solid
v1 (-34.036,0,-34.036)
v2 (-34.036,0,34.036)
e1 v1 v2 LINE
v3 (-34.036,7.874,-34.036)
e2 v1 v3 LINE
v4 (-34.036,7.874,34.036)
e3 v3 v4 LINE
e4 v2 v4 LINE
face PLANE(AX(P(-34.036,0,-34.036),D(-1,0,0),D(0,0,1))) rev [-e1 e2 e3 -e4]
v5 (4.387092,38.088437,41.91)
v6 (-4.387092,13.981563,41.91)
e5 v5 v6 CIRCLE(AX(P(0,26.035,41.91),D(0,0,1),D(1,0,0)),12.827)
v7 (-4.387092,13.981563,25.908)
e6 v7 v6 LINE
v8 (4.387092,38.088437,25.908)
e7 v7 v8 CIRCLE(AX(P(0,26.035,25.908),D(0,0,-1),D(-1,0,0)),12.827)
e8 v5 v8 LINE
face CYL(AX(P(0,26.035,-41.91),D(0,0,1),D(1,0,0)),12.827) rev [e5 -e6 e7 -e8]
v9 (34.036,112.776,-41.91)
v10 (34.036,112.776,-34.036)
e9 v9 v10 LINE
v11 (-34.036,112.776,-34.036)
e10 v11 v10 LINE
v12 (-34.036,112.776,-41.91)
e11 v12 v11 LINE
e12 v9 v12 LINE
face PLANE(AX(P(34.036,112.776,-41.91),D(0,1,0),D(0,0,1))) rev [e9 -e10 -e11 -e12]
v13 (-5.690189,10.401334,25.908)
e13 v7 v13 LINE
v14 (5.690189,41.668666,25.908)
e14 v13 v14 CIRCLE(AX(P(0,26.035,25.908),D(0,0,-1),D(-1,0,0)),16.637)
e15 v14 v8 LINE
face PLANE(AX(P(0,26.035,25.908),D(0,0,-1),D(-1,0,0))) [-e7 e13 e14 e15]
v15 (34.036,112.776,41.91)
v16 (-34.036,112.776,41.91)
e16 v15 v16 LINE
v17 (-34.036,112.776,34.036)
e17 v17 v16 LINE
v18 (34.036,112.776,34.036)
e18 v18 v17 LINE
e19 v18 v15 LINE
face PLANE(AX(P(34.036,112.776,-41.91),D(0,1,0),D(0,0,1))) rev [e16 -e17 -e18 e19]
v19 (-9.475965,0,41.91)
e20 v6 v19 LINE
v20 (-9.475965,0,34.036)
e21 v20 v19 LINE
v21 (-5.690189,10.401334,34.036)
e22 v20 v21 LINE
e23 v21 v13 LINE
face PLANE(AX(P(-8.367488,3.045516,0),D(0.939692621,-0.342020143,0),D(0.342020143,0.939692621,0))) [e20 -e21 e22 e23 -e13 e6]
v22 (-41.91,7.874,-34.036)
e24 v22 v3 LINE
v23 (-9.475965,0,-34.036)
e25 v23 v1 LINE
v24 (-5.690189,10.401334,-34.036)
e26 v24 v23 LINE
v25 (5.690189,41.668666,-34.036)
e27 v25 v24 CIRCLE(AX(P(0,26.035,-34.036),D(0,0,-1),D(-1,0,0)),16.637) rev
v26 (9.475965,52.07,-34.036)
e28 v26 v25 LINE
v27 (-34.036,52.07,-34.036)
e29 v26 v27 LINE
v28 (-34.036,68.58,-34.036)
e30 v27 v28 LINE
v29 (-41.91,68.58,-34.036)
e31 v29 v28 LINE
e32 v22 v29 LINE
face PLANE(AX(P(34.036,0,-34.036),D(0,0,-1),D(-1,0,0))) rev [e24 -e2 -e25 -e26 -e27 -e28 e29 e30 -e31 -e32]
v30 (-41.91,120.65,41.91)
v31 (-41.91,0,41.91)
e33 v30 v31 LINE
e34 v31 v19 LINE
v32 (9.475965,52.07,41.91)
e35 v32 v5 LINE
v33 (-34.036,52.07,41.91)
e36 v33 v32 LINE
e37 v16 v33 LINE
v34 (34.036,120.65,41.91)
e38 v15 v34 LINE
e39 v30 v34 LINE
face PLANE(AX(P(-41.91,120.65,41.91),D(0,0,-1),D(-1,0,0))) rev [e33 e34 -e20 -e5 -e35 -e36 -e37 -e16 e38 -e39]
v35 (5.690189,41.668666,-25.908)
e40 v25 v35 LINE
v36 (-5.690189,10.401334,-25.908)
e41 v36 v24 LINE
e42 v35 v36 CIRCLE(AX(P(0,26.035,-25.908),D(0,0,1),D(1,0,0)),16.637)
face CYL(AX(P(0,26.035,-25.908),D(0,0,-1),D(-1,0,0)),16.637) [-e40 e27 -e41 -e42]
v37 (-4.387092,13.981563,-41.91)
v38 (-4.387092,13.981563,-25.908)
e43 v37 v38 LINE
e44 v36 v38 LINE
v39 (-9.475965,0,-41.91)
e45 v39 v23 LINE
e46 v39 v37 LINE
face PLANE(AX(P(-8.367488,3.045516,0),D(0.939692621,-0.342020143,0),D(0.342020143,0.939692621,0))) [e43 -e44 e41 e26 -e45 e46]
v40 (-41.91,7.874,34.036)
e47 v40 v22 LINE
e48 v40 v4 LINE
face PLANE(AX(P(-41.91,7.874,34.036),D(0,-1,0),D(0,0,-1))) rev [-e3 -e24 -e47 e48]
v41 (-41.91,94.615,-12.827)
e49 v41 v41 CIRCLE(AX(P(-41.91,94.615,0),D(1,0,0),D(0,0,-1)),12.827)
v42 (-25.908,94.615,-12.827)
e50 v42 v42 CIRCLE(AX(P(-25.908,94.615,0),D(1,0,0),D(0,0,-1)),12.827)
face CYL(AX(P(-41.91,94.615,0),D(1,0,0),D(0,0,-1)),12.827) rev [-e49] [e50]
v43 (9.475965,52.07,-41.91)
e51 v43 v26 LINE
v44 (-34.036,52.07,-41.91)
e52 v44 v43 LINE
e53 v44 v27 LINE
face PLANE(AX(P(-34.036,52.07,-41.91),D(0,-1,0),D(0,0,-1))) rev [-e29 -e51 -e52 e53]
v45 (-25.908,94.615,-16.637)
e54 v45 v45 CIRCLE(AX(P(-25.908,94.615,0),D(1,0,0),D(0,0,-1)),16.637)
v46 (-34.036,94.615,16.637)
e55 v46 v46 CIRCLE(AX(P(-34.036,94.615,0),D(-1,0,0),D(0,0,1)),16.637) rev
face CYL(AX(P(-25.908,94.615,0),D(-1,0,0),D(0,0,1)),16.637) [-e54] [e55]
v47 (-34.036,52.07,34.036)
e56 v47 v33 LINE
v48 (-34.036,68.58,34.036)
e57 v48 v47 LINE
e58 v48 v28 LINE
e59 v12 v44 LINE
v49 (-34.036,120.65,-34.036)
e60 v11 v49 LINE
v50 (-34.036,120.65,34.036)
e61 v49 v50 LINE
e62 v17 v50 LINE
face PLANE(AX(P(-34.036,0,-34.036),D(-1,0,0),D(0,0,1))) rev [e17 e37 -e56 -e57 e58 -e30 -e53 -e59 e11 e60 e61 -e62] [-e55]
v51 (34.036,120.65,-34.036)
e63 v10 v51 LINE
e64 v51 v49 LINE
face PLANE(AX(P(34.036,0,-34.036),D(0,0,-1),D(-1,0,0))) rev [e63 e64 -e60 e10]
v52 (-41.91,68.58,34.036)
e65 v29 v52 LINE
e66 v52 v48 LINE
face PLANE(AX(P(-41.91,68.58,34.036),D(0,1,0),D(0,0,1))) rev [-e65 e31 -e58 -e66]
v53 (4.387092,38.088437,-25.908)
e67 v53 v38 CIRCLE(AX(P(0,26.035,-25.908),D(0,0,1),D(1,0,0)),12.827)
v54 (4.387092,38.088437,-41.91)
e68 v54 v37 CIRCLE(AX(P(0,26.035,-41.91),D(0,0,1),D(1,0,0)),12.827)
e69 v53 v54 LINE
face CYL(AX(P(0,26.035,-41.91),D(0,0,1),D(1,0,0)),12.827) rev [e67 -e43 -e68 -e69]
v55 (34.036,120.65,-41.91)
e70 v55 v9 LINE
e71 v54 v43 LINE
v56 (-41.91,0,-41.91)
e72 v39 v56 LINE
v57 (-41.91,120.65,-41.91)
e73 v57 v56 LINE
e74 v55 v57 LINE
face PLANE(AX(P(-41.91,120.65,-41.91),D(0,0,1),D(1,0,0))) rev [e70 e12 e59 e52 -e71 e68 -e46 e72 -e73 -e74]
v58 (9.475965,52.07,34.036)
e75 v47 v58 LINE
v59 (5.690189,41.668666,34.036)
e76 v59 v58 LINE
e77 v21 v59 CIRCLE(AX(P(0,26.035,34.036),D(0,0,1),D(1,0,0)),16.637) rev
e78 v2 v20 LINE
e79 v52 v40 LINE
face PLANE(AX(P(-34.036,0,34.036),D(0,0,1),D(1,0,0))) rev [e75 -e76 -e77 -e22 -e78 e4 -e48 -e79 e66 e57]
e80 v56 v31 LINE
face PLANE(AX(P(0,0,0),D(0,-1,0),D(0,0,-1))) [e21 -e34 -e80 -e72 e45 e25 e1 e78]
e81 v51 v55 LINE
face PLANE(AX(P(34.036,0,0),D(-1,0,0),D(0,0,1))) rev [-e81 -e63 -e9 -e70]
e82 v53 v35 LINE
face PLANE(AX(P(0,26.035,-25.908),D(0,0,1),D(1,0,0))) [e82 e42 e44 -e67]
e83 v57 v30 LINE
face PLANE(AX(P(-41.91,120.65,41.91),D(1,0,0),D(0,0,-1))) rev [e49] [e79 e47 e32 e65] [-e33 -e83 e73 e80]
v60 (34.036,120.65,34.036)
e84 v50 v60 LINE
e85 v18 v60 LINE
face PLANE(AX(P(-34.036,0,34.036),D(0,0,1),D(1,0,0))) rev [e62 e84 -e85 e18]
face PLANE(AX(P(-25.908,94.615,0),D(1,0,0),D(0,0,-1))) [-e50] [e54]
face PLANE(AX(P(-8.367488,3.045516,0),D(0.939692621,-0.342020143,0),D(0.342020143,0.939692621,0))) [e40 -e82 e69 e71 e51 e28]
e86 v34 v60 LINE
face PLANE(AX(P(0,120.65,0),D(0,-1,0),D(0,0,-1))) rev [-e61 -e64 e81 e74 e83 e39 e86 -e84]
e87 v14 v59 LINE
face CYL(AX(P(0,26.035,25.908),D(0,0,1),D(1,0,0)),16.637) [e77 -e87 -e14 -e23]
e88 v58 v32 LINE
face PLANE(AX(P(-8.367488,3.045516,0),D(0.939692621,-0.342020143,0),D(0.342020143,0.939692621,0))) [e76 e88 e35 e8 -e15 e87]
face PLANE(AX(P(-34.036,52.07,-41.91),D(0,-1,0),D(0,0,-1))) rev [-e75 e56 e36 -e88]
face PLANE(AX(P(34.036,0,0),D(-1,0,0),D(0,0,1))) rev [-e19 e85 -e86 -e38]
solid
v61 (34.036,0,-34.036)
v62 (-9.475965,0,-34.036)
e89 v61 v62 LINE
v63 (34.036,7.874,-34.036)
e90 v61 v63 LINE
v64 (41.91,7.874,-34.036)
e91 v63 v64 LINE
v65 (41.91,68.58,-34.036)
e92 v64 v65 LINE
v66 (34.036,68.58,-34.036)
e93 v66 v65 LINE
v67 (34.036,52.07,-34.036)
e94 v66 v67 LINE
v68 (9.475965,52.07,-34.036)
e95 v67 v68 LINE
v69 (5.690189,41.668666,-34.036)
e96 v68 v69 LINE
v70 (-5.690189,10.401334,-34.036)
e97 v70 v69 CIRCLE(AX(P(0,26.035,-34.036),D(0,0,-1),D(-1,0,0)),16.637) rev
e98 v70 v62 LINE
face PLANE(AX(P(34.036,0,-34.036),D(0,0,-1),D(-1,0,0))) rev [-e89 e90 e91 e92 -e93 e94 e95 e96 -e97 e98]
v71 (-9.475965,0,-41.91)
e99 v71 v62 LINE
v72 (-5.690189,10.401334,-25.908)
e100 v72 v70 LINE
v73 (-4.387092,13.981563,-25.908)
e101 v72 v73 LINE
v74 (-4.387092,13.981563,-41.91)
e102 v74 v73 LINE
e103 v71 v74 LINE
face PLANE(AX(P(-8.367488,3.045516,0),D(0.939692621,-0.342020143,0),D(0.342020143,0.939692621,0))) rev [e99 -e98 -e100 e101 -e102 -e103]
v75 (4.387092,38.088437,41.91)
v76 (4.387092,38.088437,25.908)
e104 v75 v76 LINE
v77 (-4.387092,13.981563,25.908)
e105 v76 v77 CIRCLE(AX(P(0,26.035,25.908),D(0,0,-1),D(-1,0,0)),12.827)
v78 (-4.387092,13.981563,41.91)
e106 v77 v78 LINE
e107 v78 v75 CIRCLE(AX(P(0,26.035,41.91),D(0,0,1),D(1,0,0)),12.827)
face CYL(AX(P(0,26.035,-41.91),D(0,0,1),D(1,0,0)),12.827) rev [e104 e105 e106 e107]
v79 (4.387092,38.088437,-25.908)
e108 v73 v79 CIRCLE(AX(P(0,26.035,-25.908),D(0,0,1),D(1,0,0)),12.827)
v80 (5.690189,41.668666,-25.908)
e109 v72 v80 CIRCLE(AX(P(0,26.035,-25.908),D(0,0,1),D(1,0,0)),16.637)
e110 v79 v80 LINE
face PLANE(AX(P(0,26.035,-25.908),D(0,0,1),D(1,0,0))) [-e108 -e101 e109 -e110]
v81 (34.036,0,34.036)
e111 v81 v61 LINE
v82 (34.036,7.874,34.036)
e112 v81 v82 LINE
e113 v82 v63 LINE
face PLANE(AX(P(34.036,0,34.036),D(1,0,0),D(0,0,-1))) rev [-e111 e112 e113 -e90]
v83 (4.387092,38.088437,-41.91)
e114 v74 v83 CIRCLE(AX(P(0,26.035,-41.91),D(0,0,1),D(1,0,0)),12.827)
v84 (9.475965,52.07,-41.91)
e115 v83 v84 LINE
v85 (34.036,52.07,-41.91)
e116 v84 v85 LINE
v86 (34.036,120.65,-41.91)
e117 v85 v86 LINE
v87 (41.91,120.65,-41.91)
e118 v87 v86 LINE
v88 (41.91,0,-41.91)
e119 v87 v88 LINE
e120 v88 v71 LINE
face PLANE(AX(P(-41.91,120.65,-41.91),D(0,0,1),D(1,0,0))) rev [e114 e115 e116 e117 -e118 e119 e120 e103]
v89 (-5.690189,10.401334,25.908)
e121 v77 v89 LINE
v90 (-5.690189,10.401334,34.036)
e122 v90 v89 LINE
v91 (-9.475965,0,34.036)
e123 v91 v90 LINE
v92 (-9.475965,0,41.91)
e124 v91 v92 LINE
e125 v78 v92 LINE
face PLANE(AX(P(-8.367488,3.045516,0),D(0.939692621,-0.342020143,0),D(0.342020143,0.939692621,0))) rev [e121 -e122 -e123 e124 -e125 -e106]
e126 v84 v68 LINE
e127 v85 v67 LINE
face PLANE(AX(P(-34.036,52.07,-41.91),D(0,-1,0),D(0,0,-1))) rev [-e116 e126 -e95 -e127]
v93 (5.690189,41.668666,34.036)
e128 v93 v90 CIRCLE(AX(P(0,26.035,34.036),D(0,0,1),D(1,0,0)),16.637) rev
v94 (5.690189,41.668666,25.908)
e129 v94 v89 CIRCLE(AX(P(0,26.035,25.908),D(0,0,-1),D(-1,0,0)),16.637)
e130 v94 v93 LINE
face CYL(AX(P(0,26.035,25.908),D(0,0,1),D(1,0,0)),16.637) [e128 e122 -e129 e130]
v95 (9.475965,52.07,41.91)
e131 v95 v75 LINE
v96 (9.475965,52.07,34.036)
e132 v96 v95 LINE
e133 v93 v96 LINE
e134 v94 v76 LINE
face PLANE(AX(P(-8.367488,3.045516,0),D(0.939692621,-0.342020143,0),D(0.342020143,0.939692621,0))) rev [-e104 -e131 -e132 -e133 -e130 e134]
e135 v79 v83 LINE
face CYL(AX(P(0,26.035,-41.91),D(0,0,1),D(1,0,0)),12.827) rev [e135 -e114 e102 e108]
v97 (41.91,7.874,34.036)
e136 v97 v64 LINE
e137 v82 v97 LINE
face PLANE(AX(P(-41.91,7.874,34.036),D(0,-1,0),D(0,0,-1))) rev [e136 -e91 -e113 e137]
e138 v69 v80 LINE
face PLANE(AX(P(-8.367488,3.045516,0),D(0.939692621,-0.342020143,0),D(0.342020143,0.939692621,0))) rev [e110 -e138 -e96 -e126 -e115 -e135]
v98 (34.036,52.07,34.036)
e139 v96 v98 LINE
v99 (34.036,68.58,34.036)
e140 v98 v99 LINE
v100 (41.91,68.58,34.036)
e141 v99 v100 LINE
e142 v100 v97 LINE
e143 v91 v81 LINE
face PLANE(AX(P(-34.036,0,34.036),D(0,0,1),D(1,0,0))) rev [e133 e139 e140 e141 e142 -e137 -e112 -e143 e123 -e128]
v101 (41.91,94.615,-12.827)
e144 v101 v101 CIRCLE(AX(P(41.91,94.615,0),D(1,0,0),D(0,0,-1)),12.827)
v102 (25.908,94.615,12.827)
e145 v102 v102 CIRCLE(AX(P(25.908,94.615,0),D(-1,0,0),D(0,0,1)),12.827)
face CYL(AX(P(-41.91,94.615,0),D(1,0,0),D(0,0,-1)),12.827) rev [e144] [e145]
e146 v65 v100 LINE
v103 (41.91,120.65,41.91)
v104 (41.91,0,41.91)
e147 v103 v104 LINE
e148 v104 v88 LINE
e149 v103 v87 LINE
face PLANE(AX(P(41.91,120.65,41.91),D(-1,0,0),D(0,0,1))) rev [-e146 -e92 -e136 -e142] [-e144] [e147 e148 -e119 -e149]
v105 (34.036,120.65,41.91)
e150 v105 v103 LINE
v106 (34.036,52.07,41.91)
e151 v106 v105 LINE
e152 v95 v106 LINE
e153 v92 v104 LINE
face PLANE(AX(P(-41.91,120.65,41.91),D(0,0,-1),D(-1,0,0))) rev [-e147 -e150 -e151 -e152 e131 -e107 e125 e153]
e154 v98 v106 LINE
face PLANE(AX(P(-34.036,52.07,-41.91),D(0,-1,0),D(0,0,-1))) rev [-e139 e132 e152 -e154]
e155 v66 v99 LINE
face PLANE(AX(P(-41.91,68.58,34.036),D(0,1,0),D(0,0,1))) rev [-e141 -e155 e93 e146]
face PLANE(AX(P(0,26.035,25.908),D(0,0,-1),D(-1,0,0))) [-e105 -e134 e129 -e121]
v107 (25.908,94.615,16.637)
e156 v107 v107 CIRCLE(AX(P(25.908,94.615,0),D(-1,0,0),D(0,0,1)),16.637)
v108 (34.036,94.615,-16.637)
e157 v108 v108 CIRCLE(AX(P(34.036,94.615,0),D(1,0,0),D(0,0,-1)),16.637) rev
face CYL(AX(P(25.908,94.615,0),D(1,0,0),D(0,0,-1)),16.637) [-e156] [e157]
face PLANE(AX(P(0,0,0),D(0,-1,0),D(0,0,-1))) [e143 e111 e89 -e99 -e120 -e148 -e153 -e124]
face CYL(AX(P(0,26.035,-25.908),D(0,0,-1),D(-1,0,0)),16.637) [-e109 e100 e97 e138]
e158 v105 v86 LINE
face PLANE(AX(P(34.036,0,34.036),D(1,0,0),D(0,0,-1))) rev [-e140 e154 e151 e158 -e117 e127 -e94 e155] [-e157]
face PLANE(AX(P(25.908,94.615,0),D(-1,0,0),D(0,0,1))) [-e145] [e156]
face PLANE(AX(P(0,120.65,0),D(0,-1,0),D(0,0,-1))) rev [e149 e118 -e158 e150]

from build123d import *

# Parameters (mm, degrees)
SKETCH2_W                = 83.82
SKETCH2_H                = 83.82
BOSS_EXTRUDE1_DEPTH      = 120.65
SKETCH3_R                = 12.827
CUT_EXTRUDE1_DEPTH       = 153.769967598
SKETCH4_R                = 12.827
CUT_EXTRUDE2_DEPTH       = 153.769967598
SKETCH5_W                = 68.072
SKETCH5_H                = 68.072
CUT_EXTRUDE3_DEPTH       = 135.422165955
SKETCH6_W                = 68.072
SKETCH6_H                = 60.706
CUT_EXTRUDE4_DEPTH       = 153.769967598
SKETCH7_W                = 68.072
SKETCH7_H                = 60.706
CUT_EXTRUDE5_DEPTH       = 153.769967598
BOSS_EXTRUDE6_START      = 8.128
SKETCH18_R               = 16.637
SKETCH18_R_2             = 12.827
BOSS_EXTRUDE6_DEPTH      = 8.128
SKETCH19_R               = 16.637
SKETCH19_R_2             = 12.827
BOSS_EXTRUDE7_DEPTH      = 8.128
SKETCH20_R               = 16.637
SKETCH20_R_2             = 12.827
BOSS_EXTRUDE8_DEPTH      = 8.128
BOSS_EXTRUDE9_START      = 8.128
SKETCH21_R               = 16.637
SKETCH21_R_2             = 12.827
BOSS_EXTRUDE9_DEPTH      = 8.128
INTERSECT1_START         = -41.91
INTERSECT1_DEPTH         = 83.82
INTERSECT1_START_2       = -25.908
INTERSECT1_2_OUTLINE_W   = 8.128
INTERSECT1_2_OUTLINE_H   = 52.07
INTERSECT1_2_DEPTH       = 51.816
INTERSECT1_3_OUTLINE_W   = 7.874
INTERSECT1_3_OUTLINE_H   = 52.07
INTERSECT1_3_OUTLINE_H_2 = 7.874
INTERSECT1_3_DEPTH       = 83.82
INTERSECT1_4_DEPTH       = 7.874
INTERSECT1_START_3       = 34.036
INTERSECT1_5_DEPTH       = 7.874
INTERSECT1_START_4       = -34.036
INTERSECT1_6_DEPTH       = 8.128
INTERSECT1_START_5       = 25.908
INTERSECT1_7_DEPTH       = 8.128
INTERSECT1_8_OUTLINE_R   = 12.827
INTERSECT1_8_DEPTH       = 7.874
INTERSECT1_9_OUTLINE_R   = 16.637
INTERSECT1_9_OUTLINE_R_2 = 12.827
INTERSECT1_9_DEPTH       = 8.128


with BuildPart() as part:
    # Sketch2 → Boss-Extrude1 (new body)
    with BuildSketch(Plane(origin=(0, 0, 0), x_dir=(1, 0, 0), z_dir=(0, 1, 0))):
        Rectangle(SKETCH2_W, SKETCH2_H)
    extrude(amount=BOSS_EXTRUDE1_DEPTH)

    # Sketch3 → Cut-Extrude1 (cut, through all)
    with BuildSketch(Plane.XY.offset(41.91)):
        with Locations((0, 26.035)):
            Circle(SKETCH3_R)
    extrude(amount=-CUT_EXTRUDE1_DEPTH, mode=Mode.SUBTRACT)

    # Sketch4 → Cut-Extrude2 (cut, through all)
    with BuildSketch(Plane(origin=(41.91, 0, 0), x_dir=(0, 0, -1), z_dir=(1, 0, 0))):
        with Locations((0, 94.615)):
            Circle(SKETCH4_R)
    extrude(amount=-CUT_EXTRUDE2_DEPTH, mode=Mode.SUBTRACT)

    # Sketch5 → Cut-Extrude3 (cut, through all)
    with BuildSketch(Plane(origin=(0, 120.65, 0), x_dir=(1, 0, 0), z_dir=(0, 1, 0))):
        Rectangle(SKETCH5_W, SKETCH5_H)
    extrude(amount=-CUT_EXTRUDE3_DEPTH, mode=Mode.SUBTRACT)

    # Sketch6 → Cut-Extrude4 (cut, through all)
    with BuildSketch(Plane(origin=(41.91, 0, 0), x_dir=(0, 0, -1), z_dir=(1, 0, 0))):
        with Locations((0, 38.227)):
            Rectangle(SKETCH6_W, SKETCH6_H)
    extrude(amount=-CUT_EXTRUDE4_DEPTH, mode=Mode.SUBTRACT)

    # Sketch7 → Cut-Extrude5 (cut, through all)
    with BuildSketch(Plane.XY.offset(41.91)):
        with Locations((0, 82.423)):
            Rectangle(SKETCH7_W, SKETCH7_H)
    extrude(amount=-CUT_EXTRUDE5_DEPTH, mode=Mode.SUBTRACT)

    # Sketch18 → Boss-Extrude6 (add)
    with BuildSketch(Plane(origin=(-34.036, 0, 0), x_dir=(0, 0, -1), z_dir=(1, 0, 0)).offset(BOSS_EXTRUDE6_START)):
        with Locations(Location((0, 94.615, 0), (0, 0, 180))):
            Circle(SKETCH18_R)
        with Locations((0, 94.615)):
            Circle(SKETCH18_R_2, mode=Mode.SUBTRACT)
    extrude(amount=-BOSS_EXTRUDE6_DEPTH)

    # Sketch19 → Boss-Extrude7 (add)
    with BuildSketch(Plane.ZY.offset(-34.036)):
        with Locations((0, 94.615)):
            Circle(SKETCH19_R)
        with Locations(Location((0, 94.615, 0), (0, 0, 180))):
            Circle(SKETCH19_R_2, mode=Mode.SUBTRACT)
    extrude(amount=BOSS_EXTRUDE7_DEPTH)

    # Sketch20 → Boss-Extrude8 (add)
    with BuildSketch(Plane(origin=(0, 0, 34.036), x_dir=(-1, 0, 0), z_dir=(0, 0, -1))):
        with Locations(Location((0, 26.035, 0), (0, 0, 180))):
            Circle(SKETCH20_R)
        with Locations(Location((0, 26.035, 0), (0, 0, 180))):
            Circle(SKETCH20_R_2, mode=Mode.SUBTRACT)
    extrude(amount=BOSS_EXTRUDE8_DEPTH)

    # Sketch21 → Boss-Extrude9 (add)
    with BuildSketch(Plane.XY.offset(-34.036).offset(BOSS_EXTRUDE9_START)):
        with Locations((0, 26.035)):
            Circle(SKETCH21_R)
        with Locations((0, 26.035)):
            Circle(SKETCH21_R_2, mode=Mode.SUBTRACT)
    extrude(amount=-BOSS_EXTRUDE9_DEPTH)

    # Intersect1: read off the stored shape, not the designer's step
    # Intersect1 outline → Intersect1 (cut)
    with BuildSketch(Plane.XY.offset(INTERSECT1_START)):
        with BuildLine():
            Line((41.91, 120.65), (34.036, 120.65))
            Line((34.036, 120.65), (34.036, 52.07))
            Line((34.036, 52.07), (9.475965049, 52.07))
            Line((9.475965049, 52.07), (4.387092378, 38.088437247))
            ThreePointArc((4.387092378, 38.088437247), (12.053437247, 21.647907622), (-4.387092378, 13.981562753))
            Line((-4.387092378, 13.981562753), (-9.475965049, 0))
            Line((-9.475965049, 0), (41.91, 0))
            Line((41.91, 0), (41.91, 120.65))
        make_face()
    extrude(amount=INTERSECT1_DEPTH, mode=Mode.SUBTRACT)

    # Intersect1 2 outline → Intersect1 2 (cut)
    with BuildSketch(Plane.XY.offset(INTERSECT1_START_2)):
        with Locations((29.972, 94.615)):
            Rectangle(INTERSECT1_2_OUTLINE_W, INTERSECT1_2_OUTLINE_H)
    extrude(amount=INTERSECT1_2_DEPTH, mode=Mode.SUBTRACT)


with BuildPart() as body_2:
    # Intersect1 3 outline → Intersect1 3 (new body)
    with BuildSketch(Plane.XY.offset(INTERSECT1_START)):
        with Locations((37.973, 94.615)):
            Rectangle(INTERSECT1_3_OUTLINE_W, INTERSECT1_3_OUTLINE_H)
        with Locations((37.973, 3.937)):
            Rectangle(INTERSECT1_3_OUTLINE_W, INTERSECT1_3_OUTLINE_H_2)
    extrude(amount=INTERSECT1_3_DEPTH)

    # Intersect1 4 outline → Intersect1 4 (add)
    with BuildSketch(Plane.XY.offset(INTERSECT1_START)):
        with BuildLine():
            ThreePointArc((4.387092378, 38.088437247), (12.053437247, 21.647907622), (-4.387092378, 13.981562753))
            Line((-4.387092378, 13.981562753), (-9.475965049, 0))
            Line((-9.475965049, 0), (34.036, 0))
            Line((34.036, 0), (34.036, 7.874))
            Line((34.036, 7.874), (41.91, 7.874))
            Line((41.91, 7.874), (41.91, 68.58))
            Line((41.91, 68.58), (34.036, 68.58))
            Line((34.036, 68.58), (34.036, 52.07))
            Line((34.036, 52.07), (9.475965049, 52.07))
            Line((9.475965049, 52.07), (4.387092378, 38.088437247))
        make_face()
    extrude(amount=INTERSECT1_4_DEPTH)

    # Intersect1 5 outline → Intersect1 5 (add)
    with BuildSketch(Plane.XY.offset(INTERSECT1_START_3)):
        with BuildLine():
            ThreePointArc((4.387092378, 38.088437247), (12.053437247, 21.647907622), (-4.387092378, 13.981562753))
            Line((-4.387092378, 13.981562753), (-9.475965049, 0))
            Line((-9.475965049, 0), (34.036, 0))
            Line((34.036, 0), (34.036, 7.874))
            Line((34.036, 7.874), (41.91, 7.874))
            Line((41.91, 7.874), (41.91, 68.58))
            Line((41.91, 68.58), (34.036, 68.58))
            Line((34.036, 68.58), (34.036, 52.07))
            Line((34.036, 52.07), (9.475965049, 52.07))
            Line((9.475965049, 52.07), (4.387092378, 38.088437247))
        make_face()
    extrude(amount=INTERSECT1_5_DEPTH)

    # Intersect1 6 outline → Intersect1 6 (add)
    with BuildSketch(Plane.XY.offset(INTERSECT1_START_4)):
        with BuildLine():
            Line((5.690189125, 41.668666132), (4.387092378, 38.088437247))
            ThreePointArc((4.387092378, 38.088437247), (12.053437247, 21.647907622), (-4.387092378, 13.981562753))
            Line((-4.387092378, 13.981562753), (-5.690189125, 10.401333868))
            ThreePointArc((-5.690189125, 10.401333868), (15.633666132, 20.344810875), (5.690189125, 41.668666132))
        make_face()
    extrude(amount=INTERSECT1_6_DEPTH)

    # Intersect1 7 outline → Intersect1 7 (add)
    with BuildSketch(Plane.XY.offset(INTERSECT1_START_5)):
        with BuildLine():
            Line((5.690189125, 41.668666132), (4.387092378, 38.088437247))
            ThreePointArc((4.387092378, 38.088437247), (12.053437247, 21.647907622), (-4.387092378, 13.981562753))
            Line((-4.387092378, 13.981562753), (-5.690189125, 10.401333868))
            ThreePointArc((-5.690189125, 10.401333868), (15.633666132, 20.344810875), (5.690189125, 41.668666132))
        make_face()
    extrude(amount=INTERSECT1_7_DEPTH)

    # Intersect1 8 outline → Intersect1 8 (cut)
    with BuildSketch(Plane.YZ.offset(INTERSECT1_START_3)):
        with Locations((94.615, 0)):
            Circle(INTERSECT1_8_OUTLINE_R)
    extrude(amount=INTERSECT1_8_DEPTH, mode=Mode.SUBTRACT)

    # Intersect1 9 outline → Intersect1 9 (add)
    with BuildSketch(Plane.YZ.offset(INTERSECT1_START_5)):
        with Locations((94.615, 0)):
            Circle(INTERSECT1_9_OUTLINE_R)
        with Locations((94.615, 0)):
            Circle(INTERSECT1_9_OUTLINE_R_2, mode=Mode.SUBTRACT)
    extrude(amount=INTERSECT1_9_DEPTH)


solid = Compound([part.part, body_2.part])
